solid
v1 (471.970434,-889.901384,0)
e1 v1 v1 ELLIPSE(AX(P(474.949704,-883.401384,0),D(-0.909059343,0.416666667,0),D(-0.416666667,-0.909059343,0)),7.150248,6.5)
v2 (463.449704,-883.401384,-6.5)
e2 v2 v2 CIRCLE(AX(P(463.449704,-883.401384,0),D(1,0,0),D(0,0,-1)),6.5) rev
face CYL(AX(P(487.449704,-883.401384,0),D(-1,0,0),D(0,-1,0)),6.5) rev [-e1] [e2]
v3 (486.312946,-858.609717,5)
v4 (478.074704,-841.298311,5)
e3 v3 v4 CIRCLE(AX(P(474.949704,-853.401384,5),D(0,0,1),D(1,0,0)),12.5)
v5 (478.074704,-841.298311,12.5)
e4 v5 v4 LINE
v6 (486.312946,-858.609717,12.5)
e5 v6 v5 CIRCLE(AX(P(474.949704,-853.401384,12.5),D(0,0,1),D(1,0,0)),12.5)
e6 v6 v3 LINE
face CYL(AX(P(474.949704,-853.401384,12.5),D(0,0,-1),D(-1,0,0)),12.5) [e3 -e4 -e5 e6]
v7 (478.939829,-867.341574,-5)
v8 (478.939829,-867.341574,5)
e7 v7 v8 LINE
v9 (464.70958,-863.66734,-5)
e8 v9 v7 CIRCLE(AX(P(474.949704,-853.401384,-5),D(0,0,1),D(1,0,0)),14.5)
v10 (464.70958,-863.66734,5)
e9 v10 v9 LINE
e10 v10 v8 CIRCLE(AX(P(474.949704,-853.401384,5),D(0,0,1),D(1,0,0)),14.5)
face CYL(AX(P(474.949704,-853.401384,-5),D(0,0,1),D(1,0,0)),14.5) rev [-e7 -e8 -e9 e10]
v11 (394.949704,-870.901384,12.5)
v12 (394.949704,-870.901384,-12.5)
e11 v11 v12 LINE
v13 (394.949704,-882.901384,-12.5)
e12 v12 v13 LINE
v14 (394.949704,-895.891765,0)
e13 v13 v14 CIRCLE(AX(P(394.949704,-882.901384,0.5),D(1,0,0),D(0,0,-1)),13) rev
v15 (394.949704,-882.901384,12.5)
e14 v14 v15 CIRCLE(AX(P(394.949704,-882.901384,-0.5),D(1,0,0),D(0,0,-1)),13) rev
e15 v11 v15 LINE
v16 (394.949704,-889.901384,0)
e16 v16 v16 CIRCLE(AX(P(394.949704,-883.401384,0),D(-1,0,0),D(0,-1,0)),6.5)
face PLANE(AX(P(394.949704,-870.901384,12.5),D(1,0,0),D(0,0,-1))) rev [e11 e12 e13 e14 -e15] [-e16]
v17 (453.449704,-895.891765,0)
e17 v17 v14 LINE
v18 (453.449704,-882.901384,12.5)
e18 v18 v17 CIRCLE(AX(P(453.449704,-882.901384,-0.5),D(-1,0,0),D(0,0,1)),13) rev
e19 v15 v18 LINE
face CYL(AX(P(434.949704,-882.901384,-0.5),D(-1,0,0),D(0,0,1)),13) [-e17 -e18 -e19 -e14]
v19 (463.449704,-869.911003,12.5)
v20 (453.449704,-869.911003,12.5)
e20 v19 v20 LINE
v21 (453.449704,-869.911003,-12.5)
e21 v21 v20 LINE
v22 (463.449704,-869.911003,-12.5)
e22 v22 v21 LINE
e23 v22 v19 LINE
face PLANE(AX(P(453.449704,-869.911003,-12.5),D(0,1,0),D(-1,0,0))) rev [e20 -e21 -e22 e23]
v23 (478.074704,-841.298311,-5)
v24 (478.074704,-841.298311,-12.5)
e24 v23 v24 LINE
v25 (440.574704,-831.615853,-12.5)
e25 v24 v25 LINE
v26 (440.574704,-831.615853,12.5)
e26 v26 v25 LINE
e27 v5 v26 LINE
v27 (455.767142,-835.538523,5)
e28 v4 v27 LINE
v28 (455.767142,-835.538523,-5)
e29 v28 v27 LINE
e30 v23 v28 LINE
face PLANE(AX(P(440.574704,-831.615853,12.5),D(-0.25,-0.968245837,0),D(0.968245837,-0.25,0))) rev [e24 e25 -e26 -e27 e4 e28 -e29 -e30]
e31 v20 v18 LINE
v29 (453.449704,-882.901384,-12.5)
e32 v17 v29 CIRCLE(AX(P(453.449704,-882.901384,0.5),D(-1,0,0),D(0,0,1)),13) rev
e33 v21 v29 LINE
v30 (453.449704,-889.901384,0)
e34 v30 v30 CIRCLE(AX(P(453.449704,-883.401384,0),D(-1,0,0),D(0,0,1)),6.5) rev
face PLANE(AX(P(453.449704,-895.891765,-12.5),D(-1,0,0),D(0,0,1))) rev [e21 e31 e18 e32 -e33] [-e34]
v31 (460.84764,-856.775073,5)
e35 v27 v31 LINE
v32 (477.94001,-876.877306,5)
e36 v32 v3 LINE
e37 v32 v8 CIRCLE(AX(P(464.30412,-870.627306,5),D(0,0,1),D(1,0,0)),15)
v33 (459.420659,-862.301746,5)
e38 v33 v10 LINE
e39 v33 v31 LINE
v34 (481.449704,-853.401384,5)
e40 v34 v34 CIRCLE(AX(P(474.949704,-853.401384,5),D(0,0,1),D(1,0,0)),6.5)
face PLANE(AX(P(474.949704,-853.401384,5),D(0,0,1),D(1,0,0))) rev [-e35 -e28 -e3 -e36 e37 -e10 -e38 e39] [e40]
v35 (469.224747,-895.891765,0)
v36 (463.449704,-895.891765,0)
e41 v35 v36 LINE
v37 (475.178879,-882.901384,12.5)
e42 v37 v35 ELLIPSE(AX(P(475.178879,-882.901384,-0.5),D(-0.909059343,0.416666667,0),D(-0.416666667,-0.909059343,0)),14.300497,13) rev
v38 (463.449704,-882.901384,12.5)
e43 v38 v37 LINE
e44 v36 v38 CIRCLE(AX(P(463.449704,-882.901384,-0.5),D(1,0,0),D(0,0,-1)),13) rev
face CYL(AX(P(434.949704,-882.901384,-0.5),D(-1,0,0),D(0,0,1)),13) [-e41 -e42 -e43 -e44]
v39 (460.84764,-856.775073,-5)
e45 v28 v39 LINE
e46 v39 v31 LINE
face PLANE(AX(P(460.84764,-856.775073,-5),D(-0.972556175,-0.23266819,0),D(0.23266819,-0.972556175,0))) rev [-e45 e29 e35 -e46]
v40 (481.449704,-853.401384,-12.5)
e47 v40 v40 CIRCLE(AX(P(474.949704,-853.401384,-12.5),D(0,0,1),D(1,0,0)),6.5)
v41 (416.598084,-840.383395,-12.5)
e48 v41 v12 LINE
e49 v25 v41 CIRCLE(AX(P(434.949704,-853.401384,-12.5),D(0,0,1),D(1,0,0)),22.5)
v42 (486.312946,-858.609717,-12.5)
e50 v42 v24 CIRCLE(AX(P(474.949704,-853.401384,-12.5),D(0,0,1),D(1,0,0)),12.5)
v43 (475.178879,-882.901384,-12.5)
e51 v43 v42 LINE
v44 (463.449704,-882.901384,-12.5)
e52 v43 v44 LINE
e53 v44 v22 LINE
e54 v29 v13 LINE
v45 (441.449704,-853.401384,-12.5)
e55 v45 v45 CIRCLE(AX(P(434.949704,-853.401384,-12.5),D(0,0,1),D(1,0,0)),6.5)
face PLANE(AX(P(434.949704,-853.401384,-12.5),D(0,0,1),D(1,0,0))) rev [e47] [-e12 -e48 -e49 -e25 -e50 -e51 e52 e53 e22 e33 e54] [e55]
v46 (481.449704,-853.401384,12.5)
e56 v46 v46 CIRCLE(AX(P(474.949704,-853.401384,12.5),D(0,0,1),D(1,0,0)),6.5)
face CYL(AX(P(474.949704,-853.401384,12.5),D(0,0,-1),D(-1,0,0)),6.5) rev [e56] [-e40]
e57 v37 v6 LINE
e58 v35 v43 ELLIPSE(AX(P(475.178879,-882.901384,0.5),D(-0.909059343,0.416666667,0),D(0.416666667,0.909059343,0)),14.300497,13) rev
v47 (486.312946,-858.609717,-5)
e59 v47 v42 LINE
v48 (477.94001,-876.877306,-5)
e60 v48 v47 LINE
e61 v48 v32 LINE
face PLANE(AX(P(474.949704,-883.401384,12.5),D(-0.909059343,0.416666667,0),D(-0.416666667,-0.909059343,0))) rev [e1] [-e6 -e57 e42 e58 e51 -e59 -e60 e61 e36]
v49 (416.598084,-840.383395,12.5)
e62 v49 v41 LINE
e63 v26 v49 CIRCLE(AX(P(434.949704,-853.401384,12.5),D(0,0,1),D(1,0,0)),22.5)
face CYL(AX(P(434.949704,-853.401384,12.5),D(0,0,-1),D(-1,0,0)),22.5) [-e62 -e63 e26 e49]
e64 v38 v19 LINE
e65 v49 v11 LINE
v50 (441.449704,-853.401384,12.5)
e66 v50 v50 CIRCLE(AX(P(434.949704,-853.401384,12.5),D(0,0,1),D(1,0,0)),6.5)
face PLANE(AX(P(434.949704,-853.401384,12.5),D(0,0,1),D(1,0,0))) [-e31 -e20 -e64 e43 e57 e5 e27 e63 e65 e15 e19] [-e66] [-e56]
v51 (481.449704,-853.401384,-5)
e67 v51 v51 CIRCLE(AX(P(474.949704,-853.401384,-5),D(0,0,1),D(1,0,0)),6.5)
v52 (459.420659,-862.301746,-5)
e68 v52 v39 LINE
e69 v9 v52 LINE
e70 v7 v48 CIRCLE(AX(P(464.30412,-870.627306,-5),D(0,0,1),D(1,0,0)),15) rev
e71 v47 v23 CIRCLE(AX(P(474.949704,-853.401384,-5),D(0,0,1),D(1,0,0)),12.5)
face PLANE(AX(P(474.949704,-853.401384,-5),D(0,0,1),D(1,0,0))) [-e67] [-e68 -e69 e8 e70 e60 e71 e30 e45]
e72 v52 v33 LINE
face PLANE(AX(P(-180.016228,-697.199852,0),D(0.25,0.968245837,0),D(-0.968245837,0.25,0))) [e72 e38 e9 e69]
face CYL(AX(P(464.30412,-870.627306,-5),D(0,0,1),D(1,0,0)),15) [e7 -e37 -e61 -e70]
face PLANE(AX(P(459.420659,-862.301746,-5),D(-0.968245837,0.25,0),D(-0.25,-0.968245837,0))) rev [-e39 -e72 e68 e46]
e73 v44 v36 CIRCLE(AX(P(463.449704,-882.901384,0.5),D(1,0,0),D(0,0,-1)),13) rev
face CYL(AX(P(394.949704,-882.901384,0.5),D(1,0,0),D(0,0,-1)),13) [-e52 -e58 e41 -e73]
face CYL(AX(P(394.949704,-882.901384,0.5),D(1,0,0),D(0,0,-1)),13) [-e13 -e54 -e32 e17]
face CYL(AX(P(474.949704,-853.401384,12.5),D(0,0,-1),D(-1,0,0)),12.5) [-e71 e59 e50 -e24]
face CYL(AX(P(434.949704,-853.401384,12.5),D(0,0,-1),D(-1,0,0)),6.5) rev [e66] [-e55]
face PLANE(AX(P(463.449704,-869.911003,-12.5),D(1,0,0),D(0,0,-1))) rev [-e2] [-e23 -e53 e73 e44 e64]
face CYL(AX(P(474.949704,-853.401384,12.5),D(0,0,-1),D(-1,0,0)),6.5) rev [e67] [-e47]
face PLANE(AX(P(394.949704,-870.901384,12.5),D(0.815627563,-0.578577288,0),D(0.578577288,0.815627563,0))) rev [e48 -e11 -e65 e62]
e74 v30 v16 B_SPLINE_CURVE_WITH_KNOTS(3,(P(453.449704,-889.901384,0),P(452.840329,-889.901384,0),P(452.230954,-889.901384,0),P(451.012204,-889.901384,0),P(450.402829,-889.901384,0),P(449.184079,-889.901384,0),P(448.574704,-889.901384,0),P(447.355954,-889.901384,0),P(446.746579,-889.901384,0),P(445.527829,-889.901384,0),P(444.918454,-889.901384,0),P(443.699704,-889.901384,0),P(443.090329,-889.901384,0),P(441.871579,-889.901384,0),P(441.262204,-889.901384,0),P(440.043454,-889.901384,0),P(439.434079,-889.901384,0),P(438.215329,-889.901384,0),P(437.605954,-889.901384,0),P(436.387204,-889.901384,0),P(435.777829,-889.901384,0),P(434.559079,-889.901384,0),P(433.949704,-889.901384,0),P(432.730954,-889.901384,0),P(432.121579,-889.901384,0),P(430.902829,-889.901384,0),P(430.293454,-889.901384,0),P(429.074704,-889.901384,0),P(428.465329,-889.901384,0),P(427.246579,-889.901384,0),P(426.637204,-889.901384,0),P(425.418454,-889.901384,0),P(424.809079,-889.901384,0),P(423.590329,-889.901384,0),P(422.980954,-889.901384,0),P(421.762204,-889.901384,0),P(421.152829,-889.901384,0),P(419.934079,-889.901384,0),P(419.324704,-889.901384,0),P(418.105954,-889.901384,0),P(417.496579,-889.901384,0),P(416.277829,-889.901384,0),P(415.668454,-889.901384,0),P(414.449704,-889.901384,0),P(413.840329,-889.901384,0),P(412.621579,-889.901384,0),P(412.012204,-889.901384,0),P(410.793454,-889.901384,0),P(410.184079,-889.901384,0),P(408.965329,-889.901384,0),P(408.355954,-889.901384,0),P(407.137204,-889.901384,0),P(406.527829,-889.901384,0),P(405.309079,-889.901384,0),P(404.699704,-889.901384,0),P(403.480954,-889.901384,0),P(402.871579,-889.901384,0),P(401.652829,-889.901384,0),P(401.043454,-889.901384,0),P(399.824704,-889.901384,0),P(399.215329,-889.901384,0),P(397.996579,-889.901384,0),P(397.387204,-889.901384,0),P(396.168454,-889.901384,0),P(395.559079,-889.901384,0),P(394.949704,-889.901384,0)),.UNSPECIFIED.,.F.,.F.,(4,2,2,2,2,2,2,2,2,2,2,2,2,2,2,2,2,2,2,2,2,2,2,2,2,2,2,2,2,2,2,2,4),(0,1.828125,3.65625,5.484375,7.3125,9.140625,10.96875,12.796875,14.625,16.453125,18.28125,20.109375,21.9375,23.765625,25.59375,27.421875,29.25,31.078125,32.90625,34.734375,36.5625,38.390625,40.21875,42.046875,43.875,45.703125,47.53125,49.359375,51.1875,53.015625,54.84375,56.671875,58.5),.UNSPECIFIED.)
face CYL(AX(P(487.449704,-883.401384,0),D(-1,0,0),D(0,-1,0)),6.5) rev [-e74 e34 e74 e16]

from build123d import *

# Parameters (mm, degrees)
SKETCH1_R           = 22.5
SKETCH1_R_2         = 6.5
BOSS_EXTRUDE1_DEPTH = 12.5
SKETCH2_R           = 6.5
BOSS_EXTRUDE2_DEPTH = 12.5
SKETCH3_R           = 6.5
CUT_EXTRUDE1_DEPTH  = 901.750681353
FILLET1_R           = 13
SKETCH4_W           = 10
SKETCH4_H           = 25.980762113
CUT_EXTRUDE2_DEPTH  = 1021.222656563
SKETCH5_R           = 6.5
CUT_EXTRUDE3_DEPTH  = 5
SKETCH6_W           = 23.820751316
SKETCH6_H           = 10
CUT_EXTRUDE4_DEPTH  = 25
FILLET2_R           = 15


with BuildPart() as part:
    # Sketch1 → Boss-Extrude1 (new, symmetric)
    with BuildSketch(Plane.XY):
        with Locations((434.94970424, -853.401384058)):
            Circle(SKETCH1_R)
        with Locations((434.94970424, -853.401384058)):
            Circle(SKETCH1_R_2, mode=Mode.SUBTRACT)
    extrude(amount=BOSS_EXTRUDE1_DEPTH, both=True)

    # Sketch2 → Boss-Extrude2 (add, symmetric)
    with BuildSketch(Plane.XY):
        with BuildLine():
            Line((440.57470424, -831.615852736), (478.07470424, -841.298311101))
            ThreePointArc((478.07470424, -841.298311101), (486.236797951, -848.030023379), (486.312946026, -858.609717392))
            Line((486.312946026, -858.609717392), (474.94970424, -883.401384058))
            Line((474.94970424, -883.401384058), (469.220338634, -895.901384058))
            Line((469.220338634, -895.901384058), (394.94970424, -895.901384058))
            Line((394.94970424, -895.901384058), (394.94970424, -870.901384058))
            Line((394.94970424, -870.901384058), (416.598084064, -840.383395085))
            ThreePointArc((416.598084064, -840.383395085), (427.222533672, -832.269871216), (440.57470424, -831.615852736))
        make_face()
        with Locations((474.94970424, -853.401384058)):
            Circle(SKETCH2_R, mode=Mode.SUBTRACT)
        with Locations((434.94970424, -853.401384058)):
            Circle(SKETCH2_R, mode=Mode.SUBTRACT)
    extrude(amount=BOSS_EXTRUDE2_DEPTH, both=True)

    # Sketch3 → Cut-Extrude1 (cut, through all)
    with BuildSketch(Plane.ZY.offset(-394.94970424)):
        with Locations(Location((0, -883.401384058, 0), (0, 0, 270))):
            Circle(SKETCH3_R)
    extrude(amount=-CUT_EXTRUDE1_DEPTH, mode=Mode.SUBTRACT)

    # Fillet1
    # the kernel refuses this fillet: 13 mm, written as the material it takes off along each edge
    with BuildSketch(Plane(origin=(501.720338634, -895.901384058, -12.5), x_dir=(0, 1, 0), z_dir=(-1, 0, 0))) as fillet1_piece_1:
        with BuildLine():
            CenterArc((FILLET1_R, -FILLET1_R), FILLET1_R, 90, 90)
            Line((0, -FILLET1_R), (0, 0))
            Line((0, 0), (FILLET1_R, 0))
        make_face()
    extrude(amount=139.270634394, mode=Mode.SUBTRACT)
    with BuildSketch(Plane(origin=(501.720338634, -895.901384058, 12.5), x_dir=(0, 1, 0), z_dir=(-1, 0, 0))) as fillet1_piece_2:
        with BuildLine():
            CenterArc((FILLET1_R, FILLET1_R), FILLET1_R, 180, 90)
            Line((0, FILLET1_R), (0, 0))
            Line((0, 0), (FILLET1_R, 0))
        make_face()
    extrude(amount=139.270634394, mode=Mode.SUBTRACT)

    # Sketch4 → Cut-Extrude2 (cut, through all)
    with BuildSketch(Plane.XY.offset(12.5)):
        with Locations((458.44970424, -882.901384059)):
            Rectangle(SKETCH4_W, SKETCH4_H)
    extrude(amount=-CUT_EXTRUDE2_DEPTH, mode=Mode.SUBTRACT)

    # Sketch5 → Cut-Extrude3 (cut, symmetric)
    with BuildSketch(Plane.XY):
        with BuildLine():
            Line((470.959579505, -839.461193794), (455.767141872, -835.538523265))
            Line((455.767141872, -835.538523265), (460.847639703, -856.775072808))
            ThreePointArc((460.847639703, -856.775072808), (487.47066386, -860.7140833), (470.959579505, -839.461193794))
        make_face()
        with Locations((474.94970424, -853.401384058)):
            Circle(SKETCH5_R, mode=Mode.SUBTRACT)
    extrude(amount=CUT_EXTRUDE3_DEPTH, both=True, mode=Mode.SUBTRACT)

    # Sketch6 → Cut-Extrude4 (cut)
    with BuildSketch(Plane(origin=(-173.766227741, -672.993706172, 0), x_dir=(0.9682458365518545, -0.24999999999999928, 0), z_dir=(0.24999999999999928, 0.9682458365518545, 0))):
        with Locations((672.317952287, 0)):
            Rectangle(SKETCH6_W, SKETCH6_H)
    extrude(amount=-CUT_EXTRUDE4_DEPTH, mode=Mode.SUBTRACT)

    # Fillet2
    # the kernel refuses this fillet: 15 mm, written as the material it takes off along each edge
    with BuildSketch(Plane(origin=(481.95399382, -868.119828339, 5), x_dir=(-0.9682458365518494, 0.2500000000000187, 0), z_dir=(0, 0, -1))) as fillet2_piece_1:
        with BuildLine():
            CenterArc((16.462547076, -6.840323223), FILLET2_R, 152.869318281, 37.277487885)
            Line((1.697153218, -9.482887166), (0, 0))
            Line((0, 0), (3.113016066, 0))
        make_face()
    extrude(amount=10, mode=Mode.SUBTRACT)


solid = part.part
